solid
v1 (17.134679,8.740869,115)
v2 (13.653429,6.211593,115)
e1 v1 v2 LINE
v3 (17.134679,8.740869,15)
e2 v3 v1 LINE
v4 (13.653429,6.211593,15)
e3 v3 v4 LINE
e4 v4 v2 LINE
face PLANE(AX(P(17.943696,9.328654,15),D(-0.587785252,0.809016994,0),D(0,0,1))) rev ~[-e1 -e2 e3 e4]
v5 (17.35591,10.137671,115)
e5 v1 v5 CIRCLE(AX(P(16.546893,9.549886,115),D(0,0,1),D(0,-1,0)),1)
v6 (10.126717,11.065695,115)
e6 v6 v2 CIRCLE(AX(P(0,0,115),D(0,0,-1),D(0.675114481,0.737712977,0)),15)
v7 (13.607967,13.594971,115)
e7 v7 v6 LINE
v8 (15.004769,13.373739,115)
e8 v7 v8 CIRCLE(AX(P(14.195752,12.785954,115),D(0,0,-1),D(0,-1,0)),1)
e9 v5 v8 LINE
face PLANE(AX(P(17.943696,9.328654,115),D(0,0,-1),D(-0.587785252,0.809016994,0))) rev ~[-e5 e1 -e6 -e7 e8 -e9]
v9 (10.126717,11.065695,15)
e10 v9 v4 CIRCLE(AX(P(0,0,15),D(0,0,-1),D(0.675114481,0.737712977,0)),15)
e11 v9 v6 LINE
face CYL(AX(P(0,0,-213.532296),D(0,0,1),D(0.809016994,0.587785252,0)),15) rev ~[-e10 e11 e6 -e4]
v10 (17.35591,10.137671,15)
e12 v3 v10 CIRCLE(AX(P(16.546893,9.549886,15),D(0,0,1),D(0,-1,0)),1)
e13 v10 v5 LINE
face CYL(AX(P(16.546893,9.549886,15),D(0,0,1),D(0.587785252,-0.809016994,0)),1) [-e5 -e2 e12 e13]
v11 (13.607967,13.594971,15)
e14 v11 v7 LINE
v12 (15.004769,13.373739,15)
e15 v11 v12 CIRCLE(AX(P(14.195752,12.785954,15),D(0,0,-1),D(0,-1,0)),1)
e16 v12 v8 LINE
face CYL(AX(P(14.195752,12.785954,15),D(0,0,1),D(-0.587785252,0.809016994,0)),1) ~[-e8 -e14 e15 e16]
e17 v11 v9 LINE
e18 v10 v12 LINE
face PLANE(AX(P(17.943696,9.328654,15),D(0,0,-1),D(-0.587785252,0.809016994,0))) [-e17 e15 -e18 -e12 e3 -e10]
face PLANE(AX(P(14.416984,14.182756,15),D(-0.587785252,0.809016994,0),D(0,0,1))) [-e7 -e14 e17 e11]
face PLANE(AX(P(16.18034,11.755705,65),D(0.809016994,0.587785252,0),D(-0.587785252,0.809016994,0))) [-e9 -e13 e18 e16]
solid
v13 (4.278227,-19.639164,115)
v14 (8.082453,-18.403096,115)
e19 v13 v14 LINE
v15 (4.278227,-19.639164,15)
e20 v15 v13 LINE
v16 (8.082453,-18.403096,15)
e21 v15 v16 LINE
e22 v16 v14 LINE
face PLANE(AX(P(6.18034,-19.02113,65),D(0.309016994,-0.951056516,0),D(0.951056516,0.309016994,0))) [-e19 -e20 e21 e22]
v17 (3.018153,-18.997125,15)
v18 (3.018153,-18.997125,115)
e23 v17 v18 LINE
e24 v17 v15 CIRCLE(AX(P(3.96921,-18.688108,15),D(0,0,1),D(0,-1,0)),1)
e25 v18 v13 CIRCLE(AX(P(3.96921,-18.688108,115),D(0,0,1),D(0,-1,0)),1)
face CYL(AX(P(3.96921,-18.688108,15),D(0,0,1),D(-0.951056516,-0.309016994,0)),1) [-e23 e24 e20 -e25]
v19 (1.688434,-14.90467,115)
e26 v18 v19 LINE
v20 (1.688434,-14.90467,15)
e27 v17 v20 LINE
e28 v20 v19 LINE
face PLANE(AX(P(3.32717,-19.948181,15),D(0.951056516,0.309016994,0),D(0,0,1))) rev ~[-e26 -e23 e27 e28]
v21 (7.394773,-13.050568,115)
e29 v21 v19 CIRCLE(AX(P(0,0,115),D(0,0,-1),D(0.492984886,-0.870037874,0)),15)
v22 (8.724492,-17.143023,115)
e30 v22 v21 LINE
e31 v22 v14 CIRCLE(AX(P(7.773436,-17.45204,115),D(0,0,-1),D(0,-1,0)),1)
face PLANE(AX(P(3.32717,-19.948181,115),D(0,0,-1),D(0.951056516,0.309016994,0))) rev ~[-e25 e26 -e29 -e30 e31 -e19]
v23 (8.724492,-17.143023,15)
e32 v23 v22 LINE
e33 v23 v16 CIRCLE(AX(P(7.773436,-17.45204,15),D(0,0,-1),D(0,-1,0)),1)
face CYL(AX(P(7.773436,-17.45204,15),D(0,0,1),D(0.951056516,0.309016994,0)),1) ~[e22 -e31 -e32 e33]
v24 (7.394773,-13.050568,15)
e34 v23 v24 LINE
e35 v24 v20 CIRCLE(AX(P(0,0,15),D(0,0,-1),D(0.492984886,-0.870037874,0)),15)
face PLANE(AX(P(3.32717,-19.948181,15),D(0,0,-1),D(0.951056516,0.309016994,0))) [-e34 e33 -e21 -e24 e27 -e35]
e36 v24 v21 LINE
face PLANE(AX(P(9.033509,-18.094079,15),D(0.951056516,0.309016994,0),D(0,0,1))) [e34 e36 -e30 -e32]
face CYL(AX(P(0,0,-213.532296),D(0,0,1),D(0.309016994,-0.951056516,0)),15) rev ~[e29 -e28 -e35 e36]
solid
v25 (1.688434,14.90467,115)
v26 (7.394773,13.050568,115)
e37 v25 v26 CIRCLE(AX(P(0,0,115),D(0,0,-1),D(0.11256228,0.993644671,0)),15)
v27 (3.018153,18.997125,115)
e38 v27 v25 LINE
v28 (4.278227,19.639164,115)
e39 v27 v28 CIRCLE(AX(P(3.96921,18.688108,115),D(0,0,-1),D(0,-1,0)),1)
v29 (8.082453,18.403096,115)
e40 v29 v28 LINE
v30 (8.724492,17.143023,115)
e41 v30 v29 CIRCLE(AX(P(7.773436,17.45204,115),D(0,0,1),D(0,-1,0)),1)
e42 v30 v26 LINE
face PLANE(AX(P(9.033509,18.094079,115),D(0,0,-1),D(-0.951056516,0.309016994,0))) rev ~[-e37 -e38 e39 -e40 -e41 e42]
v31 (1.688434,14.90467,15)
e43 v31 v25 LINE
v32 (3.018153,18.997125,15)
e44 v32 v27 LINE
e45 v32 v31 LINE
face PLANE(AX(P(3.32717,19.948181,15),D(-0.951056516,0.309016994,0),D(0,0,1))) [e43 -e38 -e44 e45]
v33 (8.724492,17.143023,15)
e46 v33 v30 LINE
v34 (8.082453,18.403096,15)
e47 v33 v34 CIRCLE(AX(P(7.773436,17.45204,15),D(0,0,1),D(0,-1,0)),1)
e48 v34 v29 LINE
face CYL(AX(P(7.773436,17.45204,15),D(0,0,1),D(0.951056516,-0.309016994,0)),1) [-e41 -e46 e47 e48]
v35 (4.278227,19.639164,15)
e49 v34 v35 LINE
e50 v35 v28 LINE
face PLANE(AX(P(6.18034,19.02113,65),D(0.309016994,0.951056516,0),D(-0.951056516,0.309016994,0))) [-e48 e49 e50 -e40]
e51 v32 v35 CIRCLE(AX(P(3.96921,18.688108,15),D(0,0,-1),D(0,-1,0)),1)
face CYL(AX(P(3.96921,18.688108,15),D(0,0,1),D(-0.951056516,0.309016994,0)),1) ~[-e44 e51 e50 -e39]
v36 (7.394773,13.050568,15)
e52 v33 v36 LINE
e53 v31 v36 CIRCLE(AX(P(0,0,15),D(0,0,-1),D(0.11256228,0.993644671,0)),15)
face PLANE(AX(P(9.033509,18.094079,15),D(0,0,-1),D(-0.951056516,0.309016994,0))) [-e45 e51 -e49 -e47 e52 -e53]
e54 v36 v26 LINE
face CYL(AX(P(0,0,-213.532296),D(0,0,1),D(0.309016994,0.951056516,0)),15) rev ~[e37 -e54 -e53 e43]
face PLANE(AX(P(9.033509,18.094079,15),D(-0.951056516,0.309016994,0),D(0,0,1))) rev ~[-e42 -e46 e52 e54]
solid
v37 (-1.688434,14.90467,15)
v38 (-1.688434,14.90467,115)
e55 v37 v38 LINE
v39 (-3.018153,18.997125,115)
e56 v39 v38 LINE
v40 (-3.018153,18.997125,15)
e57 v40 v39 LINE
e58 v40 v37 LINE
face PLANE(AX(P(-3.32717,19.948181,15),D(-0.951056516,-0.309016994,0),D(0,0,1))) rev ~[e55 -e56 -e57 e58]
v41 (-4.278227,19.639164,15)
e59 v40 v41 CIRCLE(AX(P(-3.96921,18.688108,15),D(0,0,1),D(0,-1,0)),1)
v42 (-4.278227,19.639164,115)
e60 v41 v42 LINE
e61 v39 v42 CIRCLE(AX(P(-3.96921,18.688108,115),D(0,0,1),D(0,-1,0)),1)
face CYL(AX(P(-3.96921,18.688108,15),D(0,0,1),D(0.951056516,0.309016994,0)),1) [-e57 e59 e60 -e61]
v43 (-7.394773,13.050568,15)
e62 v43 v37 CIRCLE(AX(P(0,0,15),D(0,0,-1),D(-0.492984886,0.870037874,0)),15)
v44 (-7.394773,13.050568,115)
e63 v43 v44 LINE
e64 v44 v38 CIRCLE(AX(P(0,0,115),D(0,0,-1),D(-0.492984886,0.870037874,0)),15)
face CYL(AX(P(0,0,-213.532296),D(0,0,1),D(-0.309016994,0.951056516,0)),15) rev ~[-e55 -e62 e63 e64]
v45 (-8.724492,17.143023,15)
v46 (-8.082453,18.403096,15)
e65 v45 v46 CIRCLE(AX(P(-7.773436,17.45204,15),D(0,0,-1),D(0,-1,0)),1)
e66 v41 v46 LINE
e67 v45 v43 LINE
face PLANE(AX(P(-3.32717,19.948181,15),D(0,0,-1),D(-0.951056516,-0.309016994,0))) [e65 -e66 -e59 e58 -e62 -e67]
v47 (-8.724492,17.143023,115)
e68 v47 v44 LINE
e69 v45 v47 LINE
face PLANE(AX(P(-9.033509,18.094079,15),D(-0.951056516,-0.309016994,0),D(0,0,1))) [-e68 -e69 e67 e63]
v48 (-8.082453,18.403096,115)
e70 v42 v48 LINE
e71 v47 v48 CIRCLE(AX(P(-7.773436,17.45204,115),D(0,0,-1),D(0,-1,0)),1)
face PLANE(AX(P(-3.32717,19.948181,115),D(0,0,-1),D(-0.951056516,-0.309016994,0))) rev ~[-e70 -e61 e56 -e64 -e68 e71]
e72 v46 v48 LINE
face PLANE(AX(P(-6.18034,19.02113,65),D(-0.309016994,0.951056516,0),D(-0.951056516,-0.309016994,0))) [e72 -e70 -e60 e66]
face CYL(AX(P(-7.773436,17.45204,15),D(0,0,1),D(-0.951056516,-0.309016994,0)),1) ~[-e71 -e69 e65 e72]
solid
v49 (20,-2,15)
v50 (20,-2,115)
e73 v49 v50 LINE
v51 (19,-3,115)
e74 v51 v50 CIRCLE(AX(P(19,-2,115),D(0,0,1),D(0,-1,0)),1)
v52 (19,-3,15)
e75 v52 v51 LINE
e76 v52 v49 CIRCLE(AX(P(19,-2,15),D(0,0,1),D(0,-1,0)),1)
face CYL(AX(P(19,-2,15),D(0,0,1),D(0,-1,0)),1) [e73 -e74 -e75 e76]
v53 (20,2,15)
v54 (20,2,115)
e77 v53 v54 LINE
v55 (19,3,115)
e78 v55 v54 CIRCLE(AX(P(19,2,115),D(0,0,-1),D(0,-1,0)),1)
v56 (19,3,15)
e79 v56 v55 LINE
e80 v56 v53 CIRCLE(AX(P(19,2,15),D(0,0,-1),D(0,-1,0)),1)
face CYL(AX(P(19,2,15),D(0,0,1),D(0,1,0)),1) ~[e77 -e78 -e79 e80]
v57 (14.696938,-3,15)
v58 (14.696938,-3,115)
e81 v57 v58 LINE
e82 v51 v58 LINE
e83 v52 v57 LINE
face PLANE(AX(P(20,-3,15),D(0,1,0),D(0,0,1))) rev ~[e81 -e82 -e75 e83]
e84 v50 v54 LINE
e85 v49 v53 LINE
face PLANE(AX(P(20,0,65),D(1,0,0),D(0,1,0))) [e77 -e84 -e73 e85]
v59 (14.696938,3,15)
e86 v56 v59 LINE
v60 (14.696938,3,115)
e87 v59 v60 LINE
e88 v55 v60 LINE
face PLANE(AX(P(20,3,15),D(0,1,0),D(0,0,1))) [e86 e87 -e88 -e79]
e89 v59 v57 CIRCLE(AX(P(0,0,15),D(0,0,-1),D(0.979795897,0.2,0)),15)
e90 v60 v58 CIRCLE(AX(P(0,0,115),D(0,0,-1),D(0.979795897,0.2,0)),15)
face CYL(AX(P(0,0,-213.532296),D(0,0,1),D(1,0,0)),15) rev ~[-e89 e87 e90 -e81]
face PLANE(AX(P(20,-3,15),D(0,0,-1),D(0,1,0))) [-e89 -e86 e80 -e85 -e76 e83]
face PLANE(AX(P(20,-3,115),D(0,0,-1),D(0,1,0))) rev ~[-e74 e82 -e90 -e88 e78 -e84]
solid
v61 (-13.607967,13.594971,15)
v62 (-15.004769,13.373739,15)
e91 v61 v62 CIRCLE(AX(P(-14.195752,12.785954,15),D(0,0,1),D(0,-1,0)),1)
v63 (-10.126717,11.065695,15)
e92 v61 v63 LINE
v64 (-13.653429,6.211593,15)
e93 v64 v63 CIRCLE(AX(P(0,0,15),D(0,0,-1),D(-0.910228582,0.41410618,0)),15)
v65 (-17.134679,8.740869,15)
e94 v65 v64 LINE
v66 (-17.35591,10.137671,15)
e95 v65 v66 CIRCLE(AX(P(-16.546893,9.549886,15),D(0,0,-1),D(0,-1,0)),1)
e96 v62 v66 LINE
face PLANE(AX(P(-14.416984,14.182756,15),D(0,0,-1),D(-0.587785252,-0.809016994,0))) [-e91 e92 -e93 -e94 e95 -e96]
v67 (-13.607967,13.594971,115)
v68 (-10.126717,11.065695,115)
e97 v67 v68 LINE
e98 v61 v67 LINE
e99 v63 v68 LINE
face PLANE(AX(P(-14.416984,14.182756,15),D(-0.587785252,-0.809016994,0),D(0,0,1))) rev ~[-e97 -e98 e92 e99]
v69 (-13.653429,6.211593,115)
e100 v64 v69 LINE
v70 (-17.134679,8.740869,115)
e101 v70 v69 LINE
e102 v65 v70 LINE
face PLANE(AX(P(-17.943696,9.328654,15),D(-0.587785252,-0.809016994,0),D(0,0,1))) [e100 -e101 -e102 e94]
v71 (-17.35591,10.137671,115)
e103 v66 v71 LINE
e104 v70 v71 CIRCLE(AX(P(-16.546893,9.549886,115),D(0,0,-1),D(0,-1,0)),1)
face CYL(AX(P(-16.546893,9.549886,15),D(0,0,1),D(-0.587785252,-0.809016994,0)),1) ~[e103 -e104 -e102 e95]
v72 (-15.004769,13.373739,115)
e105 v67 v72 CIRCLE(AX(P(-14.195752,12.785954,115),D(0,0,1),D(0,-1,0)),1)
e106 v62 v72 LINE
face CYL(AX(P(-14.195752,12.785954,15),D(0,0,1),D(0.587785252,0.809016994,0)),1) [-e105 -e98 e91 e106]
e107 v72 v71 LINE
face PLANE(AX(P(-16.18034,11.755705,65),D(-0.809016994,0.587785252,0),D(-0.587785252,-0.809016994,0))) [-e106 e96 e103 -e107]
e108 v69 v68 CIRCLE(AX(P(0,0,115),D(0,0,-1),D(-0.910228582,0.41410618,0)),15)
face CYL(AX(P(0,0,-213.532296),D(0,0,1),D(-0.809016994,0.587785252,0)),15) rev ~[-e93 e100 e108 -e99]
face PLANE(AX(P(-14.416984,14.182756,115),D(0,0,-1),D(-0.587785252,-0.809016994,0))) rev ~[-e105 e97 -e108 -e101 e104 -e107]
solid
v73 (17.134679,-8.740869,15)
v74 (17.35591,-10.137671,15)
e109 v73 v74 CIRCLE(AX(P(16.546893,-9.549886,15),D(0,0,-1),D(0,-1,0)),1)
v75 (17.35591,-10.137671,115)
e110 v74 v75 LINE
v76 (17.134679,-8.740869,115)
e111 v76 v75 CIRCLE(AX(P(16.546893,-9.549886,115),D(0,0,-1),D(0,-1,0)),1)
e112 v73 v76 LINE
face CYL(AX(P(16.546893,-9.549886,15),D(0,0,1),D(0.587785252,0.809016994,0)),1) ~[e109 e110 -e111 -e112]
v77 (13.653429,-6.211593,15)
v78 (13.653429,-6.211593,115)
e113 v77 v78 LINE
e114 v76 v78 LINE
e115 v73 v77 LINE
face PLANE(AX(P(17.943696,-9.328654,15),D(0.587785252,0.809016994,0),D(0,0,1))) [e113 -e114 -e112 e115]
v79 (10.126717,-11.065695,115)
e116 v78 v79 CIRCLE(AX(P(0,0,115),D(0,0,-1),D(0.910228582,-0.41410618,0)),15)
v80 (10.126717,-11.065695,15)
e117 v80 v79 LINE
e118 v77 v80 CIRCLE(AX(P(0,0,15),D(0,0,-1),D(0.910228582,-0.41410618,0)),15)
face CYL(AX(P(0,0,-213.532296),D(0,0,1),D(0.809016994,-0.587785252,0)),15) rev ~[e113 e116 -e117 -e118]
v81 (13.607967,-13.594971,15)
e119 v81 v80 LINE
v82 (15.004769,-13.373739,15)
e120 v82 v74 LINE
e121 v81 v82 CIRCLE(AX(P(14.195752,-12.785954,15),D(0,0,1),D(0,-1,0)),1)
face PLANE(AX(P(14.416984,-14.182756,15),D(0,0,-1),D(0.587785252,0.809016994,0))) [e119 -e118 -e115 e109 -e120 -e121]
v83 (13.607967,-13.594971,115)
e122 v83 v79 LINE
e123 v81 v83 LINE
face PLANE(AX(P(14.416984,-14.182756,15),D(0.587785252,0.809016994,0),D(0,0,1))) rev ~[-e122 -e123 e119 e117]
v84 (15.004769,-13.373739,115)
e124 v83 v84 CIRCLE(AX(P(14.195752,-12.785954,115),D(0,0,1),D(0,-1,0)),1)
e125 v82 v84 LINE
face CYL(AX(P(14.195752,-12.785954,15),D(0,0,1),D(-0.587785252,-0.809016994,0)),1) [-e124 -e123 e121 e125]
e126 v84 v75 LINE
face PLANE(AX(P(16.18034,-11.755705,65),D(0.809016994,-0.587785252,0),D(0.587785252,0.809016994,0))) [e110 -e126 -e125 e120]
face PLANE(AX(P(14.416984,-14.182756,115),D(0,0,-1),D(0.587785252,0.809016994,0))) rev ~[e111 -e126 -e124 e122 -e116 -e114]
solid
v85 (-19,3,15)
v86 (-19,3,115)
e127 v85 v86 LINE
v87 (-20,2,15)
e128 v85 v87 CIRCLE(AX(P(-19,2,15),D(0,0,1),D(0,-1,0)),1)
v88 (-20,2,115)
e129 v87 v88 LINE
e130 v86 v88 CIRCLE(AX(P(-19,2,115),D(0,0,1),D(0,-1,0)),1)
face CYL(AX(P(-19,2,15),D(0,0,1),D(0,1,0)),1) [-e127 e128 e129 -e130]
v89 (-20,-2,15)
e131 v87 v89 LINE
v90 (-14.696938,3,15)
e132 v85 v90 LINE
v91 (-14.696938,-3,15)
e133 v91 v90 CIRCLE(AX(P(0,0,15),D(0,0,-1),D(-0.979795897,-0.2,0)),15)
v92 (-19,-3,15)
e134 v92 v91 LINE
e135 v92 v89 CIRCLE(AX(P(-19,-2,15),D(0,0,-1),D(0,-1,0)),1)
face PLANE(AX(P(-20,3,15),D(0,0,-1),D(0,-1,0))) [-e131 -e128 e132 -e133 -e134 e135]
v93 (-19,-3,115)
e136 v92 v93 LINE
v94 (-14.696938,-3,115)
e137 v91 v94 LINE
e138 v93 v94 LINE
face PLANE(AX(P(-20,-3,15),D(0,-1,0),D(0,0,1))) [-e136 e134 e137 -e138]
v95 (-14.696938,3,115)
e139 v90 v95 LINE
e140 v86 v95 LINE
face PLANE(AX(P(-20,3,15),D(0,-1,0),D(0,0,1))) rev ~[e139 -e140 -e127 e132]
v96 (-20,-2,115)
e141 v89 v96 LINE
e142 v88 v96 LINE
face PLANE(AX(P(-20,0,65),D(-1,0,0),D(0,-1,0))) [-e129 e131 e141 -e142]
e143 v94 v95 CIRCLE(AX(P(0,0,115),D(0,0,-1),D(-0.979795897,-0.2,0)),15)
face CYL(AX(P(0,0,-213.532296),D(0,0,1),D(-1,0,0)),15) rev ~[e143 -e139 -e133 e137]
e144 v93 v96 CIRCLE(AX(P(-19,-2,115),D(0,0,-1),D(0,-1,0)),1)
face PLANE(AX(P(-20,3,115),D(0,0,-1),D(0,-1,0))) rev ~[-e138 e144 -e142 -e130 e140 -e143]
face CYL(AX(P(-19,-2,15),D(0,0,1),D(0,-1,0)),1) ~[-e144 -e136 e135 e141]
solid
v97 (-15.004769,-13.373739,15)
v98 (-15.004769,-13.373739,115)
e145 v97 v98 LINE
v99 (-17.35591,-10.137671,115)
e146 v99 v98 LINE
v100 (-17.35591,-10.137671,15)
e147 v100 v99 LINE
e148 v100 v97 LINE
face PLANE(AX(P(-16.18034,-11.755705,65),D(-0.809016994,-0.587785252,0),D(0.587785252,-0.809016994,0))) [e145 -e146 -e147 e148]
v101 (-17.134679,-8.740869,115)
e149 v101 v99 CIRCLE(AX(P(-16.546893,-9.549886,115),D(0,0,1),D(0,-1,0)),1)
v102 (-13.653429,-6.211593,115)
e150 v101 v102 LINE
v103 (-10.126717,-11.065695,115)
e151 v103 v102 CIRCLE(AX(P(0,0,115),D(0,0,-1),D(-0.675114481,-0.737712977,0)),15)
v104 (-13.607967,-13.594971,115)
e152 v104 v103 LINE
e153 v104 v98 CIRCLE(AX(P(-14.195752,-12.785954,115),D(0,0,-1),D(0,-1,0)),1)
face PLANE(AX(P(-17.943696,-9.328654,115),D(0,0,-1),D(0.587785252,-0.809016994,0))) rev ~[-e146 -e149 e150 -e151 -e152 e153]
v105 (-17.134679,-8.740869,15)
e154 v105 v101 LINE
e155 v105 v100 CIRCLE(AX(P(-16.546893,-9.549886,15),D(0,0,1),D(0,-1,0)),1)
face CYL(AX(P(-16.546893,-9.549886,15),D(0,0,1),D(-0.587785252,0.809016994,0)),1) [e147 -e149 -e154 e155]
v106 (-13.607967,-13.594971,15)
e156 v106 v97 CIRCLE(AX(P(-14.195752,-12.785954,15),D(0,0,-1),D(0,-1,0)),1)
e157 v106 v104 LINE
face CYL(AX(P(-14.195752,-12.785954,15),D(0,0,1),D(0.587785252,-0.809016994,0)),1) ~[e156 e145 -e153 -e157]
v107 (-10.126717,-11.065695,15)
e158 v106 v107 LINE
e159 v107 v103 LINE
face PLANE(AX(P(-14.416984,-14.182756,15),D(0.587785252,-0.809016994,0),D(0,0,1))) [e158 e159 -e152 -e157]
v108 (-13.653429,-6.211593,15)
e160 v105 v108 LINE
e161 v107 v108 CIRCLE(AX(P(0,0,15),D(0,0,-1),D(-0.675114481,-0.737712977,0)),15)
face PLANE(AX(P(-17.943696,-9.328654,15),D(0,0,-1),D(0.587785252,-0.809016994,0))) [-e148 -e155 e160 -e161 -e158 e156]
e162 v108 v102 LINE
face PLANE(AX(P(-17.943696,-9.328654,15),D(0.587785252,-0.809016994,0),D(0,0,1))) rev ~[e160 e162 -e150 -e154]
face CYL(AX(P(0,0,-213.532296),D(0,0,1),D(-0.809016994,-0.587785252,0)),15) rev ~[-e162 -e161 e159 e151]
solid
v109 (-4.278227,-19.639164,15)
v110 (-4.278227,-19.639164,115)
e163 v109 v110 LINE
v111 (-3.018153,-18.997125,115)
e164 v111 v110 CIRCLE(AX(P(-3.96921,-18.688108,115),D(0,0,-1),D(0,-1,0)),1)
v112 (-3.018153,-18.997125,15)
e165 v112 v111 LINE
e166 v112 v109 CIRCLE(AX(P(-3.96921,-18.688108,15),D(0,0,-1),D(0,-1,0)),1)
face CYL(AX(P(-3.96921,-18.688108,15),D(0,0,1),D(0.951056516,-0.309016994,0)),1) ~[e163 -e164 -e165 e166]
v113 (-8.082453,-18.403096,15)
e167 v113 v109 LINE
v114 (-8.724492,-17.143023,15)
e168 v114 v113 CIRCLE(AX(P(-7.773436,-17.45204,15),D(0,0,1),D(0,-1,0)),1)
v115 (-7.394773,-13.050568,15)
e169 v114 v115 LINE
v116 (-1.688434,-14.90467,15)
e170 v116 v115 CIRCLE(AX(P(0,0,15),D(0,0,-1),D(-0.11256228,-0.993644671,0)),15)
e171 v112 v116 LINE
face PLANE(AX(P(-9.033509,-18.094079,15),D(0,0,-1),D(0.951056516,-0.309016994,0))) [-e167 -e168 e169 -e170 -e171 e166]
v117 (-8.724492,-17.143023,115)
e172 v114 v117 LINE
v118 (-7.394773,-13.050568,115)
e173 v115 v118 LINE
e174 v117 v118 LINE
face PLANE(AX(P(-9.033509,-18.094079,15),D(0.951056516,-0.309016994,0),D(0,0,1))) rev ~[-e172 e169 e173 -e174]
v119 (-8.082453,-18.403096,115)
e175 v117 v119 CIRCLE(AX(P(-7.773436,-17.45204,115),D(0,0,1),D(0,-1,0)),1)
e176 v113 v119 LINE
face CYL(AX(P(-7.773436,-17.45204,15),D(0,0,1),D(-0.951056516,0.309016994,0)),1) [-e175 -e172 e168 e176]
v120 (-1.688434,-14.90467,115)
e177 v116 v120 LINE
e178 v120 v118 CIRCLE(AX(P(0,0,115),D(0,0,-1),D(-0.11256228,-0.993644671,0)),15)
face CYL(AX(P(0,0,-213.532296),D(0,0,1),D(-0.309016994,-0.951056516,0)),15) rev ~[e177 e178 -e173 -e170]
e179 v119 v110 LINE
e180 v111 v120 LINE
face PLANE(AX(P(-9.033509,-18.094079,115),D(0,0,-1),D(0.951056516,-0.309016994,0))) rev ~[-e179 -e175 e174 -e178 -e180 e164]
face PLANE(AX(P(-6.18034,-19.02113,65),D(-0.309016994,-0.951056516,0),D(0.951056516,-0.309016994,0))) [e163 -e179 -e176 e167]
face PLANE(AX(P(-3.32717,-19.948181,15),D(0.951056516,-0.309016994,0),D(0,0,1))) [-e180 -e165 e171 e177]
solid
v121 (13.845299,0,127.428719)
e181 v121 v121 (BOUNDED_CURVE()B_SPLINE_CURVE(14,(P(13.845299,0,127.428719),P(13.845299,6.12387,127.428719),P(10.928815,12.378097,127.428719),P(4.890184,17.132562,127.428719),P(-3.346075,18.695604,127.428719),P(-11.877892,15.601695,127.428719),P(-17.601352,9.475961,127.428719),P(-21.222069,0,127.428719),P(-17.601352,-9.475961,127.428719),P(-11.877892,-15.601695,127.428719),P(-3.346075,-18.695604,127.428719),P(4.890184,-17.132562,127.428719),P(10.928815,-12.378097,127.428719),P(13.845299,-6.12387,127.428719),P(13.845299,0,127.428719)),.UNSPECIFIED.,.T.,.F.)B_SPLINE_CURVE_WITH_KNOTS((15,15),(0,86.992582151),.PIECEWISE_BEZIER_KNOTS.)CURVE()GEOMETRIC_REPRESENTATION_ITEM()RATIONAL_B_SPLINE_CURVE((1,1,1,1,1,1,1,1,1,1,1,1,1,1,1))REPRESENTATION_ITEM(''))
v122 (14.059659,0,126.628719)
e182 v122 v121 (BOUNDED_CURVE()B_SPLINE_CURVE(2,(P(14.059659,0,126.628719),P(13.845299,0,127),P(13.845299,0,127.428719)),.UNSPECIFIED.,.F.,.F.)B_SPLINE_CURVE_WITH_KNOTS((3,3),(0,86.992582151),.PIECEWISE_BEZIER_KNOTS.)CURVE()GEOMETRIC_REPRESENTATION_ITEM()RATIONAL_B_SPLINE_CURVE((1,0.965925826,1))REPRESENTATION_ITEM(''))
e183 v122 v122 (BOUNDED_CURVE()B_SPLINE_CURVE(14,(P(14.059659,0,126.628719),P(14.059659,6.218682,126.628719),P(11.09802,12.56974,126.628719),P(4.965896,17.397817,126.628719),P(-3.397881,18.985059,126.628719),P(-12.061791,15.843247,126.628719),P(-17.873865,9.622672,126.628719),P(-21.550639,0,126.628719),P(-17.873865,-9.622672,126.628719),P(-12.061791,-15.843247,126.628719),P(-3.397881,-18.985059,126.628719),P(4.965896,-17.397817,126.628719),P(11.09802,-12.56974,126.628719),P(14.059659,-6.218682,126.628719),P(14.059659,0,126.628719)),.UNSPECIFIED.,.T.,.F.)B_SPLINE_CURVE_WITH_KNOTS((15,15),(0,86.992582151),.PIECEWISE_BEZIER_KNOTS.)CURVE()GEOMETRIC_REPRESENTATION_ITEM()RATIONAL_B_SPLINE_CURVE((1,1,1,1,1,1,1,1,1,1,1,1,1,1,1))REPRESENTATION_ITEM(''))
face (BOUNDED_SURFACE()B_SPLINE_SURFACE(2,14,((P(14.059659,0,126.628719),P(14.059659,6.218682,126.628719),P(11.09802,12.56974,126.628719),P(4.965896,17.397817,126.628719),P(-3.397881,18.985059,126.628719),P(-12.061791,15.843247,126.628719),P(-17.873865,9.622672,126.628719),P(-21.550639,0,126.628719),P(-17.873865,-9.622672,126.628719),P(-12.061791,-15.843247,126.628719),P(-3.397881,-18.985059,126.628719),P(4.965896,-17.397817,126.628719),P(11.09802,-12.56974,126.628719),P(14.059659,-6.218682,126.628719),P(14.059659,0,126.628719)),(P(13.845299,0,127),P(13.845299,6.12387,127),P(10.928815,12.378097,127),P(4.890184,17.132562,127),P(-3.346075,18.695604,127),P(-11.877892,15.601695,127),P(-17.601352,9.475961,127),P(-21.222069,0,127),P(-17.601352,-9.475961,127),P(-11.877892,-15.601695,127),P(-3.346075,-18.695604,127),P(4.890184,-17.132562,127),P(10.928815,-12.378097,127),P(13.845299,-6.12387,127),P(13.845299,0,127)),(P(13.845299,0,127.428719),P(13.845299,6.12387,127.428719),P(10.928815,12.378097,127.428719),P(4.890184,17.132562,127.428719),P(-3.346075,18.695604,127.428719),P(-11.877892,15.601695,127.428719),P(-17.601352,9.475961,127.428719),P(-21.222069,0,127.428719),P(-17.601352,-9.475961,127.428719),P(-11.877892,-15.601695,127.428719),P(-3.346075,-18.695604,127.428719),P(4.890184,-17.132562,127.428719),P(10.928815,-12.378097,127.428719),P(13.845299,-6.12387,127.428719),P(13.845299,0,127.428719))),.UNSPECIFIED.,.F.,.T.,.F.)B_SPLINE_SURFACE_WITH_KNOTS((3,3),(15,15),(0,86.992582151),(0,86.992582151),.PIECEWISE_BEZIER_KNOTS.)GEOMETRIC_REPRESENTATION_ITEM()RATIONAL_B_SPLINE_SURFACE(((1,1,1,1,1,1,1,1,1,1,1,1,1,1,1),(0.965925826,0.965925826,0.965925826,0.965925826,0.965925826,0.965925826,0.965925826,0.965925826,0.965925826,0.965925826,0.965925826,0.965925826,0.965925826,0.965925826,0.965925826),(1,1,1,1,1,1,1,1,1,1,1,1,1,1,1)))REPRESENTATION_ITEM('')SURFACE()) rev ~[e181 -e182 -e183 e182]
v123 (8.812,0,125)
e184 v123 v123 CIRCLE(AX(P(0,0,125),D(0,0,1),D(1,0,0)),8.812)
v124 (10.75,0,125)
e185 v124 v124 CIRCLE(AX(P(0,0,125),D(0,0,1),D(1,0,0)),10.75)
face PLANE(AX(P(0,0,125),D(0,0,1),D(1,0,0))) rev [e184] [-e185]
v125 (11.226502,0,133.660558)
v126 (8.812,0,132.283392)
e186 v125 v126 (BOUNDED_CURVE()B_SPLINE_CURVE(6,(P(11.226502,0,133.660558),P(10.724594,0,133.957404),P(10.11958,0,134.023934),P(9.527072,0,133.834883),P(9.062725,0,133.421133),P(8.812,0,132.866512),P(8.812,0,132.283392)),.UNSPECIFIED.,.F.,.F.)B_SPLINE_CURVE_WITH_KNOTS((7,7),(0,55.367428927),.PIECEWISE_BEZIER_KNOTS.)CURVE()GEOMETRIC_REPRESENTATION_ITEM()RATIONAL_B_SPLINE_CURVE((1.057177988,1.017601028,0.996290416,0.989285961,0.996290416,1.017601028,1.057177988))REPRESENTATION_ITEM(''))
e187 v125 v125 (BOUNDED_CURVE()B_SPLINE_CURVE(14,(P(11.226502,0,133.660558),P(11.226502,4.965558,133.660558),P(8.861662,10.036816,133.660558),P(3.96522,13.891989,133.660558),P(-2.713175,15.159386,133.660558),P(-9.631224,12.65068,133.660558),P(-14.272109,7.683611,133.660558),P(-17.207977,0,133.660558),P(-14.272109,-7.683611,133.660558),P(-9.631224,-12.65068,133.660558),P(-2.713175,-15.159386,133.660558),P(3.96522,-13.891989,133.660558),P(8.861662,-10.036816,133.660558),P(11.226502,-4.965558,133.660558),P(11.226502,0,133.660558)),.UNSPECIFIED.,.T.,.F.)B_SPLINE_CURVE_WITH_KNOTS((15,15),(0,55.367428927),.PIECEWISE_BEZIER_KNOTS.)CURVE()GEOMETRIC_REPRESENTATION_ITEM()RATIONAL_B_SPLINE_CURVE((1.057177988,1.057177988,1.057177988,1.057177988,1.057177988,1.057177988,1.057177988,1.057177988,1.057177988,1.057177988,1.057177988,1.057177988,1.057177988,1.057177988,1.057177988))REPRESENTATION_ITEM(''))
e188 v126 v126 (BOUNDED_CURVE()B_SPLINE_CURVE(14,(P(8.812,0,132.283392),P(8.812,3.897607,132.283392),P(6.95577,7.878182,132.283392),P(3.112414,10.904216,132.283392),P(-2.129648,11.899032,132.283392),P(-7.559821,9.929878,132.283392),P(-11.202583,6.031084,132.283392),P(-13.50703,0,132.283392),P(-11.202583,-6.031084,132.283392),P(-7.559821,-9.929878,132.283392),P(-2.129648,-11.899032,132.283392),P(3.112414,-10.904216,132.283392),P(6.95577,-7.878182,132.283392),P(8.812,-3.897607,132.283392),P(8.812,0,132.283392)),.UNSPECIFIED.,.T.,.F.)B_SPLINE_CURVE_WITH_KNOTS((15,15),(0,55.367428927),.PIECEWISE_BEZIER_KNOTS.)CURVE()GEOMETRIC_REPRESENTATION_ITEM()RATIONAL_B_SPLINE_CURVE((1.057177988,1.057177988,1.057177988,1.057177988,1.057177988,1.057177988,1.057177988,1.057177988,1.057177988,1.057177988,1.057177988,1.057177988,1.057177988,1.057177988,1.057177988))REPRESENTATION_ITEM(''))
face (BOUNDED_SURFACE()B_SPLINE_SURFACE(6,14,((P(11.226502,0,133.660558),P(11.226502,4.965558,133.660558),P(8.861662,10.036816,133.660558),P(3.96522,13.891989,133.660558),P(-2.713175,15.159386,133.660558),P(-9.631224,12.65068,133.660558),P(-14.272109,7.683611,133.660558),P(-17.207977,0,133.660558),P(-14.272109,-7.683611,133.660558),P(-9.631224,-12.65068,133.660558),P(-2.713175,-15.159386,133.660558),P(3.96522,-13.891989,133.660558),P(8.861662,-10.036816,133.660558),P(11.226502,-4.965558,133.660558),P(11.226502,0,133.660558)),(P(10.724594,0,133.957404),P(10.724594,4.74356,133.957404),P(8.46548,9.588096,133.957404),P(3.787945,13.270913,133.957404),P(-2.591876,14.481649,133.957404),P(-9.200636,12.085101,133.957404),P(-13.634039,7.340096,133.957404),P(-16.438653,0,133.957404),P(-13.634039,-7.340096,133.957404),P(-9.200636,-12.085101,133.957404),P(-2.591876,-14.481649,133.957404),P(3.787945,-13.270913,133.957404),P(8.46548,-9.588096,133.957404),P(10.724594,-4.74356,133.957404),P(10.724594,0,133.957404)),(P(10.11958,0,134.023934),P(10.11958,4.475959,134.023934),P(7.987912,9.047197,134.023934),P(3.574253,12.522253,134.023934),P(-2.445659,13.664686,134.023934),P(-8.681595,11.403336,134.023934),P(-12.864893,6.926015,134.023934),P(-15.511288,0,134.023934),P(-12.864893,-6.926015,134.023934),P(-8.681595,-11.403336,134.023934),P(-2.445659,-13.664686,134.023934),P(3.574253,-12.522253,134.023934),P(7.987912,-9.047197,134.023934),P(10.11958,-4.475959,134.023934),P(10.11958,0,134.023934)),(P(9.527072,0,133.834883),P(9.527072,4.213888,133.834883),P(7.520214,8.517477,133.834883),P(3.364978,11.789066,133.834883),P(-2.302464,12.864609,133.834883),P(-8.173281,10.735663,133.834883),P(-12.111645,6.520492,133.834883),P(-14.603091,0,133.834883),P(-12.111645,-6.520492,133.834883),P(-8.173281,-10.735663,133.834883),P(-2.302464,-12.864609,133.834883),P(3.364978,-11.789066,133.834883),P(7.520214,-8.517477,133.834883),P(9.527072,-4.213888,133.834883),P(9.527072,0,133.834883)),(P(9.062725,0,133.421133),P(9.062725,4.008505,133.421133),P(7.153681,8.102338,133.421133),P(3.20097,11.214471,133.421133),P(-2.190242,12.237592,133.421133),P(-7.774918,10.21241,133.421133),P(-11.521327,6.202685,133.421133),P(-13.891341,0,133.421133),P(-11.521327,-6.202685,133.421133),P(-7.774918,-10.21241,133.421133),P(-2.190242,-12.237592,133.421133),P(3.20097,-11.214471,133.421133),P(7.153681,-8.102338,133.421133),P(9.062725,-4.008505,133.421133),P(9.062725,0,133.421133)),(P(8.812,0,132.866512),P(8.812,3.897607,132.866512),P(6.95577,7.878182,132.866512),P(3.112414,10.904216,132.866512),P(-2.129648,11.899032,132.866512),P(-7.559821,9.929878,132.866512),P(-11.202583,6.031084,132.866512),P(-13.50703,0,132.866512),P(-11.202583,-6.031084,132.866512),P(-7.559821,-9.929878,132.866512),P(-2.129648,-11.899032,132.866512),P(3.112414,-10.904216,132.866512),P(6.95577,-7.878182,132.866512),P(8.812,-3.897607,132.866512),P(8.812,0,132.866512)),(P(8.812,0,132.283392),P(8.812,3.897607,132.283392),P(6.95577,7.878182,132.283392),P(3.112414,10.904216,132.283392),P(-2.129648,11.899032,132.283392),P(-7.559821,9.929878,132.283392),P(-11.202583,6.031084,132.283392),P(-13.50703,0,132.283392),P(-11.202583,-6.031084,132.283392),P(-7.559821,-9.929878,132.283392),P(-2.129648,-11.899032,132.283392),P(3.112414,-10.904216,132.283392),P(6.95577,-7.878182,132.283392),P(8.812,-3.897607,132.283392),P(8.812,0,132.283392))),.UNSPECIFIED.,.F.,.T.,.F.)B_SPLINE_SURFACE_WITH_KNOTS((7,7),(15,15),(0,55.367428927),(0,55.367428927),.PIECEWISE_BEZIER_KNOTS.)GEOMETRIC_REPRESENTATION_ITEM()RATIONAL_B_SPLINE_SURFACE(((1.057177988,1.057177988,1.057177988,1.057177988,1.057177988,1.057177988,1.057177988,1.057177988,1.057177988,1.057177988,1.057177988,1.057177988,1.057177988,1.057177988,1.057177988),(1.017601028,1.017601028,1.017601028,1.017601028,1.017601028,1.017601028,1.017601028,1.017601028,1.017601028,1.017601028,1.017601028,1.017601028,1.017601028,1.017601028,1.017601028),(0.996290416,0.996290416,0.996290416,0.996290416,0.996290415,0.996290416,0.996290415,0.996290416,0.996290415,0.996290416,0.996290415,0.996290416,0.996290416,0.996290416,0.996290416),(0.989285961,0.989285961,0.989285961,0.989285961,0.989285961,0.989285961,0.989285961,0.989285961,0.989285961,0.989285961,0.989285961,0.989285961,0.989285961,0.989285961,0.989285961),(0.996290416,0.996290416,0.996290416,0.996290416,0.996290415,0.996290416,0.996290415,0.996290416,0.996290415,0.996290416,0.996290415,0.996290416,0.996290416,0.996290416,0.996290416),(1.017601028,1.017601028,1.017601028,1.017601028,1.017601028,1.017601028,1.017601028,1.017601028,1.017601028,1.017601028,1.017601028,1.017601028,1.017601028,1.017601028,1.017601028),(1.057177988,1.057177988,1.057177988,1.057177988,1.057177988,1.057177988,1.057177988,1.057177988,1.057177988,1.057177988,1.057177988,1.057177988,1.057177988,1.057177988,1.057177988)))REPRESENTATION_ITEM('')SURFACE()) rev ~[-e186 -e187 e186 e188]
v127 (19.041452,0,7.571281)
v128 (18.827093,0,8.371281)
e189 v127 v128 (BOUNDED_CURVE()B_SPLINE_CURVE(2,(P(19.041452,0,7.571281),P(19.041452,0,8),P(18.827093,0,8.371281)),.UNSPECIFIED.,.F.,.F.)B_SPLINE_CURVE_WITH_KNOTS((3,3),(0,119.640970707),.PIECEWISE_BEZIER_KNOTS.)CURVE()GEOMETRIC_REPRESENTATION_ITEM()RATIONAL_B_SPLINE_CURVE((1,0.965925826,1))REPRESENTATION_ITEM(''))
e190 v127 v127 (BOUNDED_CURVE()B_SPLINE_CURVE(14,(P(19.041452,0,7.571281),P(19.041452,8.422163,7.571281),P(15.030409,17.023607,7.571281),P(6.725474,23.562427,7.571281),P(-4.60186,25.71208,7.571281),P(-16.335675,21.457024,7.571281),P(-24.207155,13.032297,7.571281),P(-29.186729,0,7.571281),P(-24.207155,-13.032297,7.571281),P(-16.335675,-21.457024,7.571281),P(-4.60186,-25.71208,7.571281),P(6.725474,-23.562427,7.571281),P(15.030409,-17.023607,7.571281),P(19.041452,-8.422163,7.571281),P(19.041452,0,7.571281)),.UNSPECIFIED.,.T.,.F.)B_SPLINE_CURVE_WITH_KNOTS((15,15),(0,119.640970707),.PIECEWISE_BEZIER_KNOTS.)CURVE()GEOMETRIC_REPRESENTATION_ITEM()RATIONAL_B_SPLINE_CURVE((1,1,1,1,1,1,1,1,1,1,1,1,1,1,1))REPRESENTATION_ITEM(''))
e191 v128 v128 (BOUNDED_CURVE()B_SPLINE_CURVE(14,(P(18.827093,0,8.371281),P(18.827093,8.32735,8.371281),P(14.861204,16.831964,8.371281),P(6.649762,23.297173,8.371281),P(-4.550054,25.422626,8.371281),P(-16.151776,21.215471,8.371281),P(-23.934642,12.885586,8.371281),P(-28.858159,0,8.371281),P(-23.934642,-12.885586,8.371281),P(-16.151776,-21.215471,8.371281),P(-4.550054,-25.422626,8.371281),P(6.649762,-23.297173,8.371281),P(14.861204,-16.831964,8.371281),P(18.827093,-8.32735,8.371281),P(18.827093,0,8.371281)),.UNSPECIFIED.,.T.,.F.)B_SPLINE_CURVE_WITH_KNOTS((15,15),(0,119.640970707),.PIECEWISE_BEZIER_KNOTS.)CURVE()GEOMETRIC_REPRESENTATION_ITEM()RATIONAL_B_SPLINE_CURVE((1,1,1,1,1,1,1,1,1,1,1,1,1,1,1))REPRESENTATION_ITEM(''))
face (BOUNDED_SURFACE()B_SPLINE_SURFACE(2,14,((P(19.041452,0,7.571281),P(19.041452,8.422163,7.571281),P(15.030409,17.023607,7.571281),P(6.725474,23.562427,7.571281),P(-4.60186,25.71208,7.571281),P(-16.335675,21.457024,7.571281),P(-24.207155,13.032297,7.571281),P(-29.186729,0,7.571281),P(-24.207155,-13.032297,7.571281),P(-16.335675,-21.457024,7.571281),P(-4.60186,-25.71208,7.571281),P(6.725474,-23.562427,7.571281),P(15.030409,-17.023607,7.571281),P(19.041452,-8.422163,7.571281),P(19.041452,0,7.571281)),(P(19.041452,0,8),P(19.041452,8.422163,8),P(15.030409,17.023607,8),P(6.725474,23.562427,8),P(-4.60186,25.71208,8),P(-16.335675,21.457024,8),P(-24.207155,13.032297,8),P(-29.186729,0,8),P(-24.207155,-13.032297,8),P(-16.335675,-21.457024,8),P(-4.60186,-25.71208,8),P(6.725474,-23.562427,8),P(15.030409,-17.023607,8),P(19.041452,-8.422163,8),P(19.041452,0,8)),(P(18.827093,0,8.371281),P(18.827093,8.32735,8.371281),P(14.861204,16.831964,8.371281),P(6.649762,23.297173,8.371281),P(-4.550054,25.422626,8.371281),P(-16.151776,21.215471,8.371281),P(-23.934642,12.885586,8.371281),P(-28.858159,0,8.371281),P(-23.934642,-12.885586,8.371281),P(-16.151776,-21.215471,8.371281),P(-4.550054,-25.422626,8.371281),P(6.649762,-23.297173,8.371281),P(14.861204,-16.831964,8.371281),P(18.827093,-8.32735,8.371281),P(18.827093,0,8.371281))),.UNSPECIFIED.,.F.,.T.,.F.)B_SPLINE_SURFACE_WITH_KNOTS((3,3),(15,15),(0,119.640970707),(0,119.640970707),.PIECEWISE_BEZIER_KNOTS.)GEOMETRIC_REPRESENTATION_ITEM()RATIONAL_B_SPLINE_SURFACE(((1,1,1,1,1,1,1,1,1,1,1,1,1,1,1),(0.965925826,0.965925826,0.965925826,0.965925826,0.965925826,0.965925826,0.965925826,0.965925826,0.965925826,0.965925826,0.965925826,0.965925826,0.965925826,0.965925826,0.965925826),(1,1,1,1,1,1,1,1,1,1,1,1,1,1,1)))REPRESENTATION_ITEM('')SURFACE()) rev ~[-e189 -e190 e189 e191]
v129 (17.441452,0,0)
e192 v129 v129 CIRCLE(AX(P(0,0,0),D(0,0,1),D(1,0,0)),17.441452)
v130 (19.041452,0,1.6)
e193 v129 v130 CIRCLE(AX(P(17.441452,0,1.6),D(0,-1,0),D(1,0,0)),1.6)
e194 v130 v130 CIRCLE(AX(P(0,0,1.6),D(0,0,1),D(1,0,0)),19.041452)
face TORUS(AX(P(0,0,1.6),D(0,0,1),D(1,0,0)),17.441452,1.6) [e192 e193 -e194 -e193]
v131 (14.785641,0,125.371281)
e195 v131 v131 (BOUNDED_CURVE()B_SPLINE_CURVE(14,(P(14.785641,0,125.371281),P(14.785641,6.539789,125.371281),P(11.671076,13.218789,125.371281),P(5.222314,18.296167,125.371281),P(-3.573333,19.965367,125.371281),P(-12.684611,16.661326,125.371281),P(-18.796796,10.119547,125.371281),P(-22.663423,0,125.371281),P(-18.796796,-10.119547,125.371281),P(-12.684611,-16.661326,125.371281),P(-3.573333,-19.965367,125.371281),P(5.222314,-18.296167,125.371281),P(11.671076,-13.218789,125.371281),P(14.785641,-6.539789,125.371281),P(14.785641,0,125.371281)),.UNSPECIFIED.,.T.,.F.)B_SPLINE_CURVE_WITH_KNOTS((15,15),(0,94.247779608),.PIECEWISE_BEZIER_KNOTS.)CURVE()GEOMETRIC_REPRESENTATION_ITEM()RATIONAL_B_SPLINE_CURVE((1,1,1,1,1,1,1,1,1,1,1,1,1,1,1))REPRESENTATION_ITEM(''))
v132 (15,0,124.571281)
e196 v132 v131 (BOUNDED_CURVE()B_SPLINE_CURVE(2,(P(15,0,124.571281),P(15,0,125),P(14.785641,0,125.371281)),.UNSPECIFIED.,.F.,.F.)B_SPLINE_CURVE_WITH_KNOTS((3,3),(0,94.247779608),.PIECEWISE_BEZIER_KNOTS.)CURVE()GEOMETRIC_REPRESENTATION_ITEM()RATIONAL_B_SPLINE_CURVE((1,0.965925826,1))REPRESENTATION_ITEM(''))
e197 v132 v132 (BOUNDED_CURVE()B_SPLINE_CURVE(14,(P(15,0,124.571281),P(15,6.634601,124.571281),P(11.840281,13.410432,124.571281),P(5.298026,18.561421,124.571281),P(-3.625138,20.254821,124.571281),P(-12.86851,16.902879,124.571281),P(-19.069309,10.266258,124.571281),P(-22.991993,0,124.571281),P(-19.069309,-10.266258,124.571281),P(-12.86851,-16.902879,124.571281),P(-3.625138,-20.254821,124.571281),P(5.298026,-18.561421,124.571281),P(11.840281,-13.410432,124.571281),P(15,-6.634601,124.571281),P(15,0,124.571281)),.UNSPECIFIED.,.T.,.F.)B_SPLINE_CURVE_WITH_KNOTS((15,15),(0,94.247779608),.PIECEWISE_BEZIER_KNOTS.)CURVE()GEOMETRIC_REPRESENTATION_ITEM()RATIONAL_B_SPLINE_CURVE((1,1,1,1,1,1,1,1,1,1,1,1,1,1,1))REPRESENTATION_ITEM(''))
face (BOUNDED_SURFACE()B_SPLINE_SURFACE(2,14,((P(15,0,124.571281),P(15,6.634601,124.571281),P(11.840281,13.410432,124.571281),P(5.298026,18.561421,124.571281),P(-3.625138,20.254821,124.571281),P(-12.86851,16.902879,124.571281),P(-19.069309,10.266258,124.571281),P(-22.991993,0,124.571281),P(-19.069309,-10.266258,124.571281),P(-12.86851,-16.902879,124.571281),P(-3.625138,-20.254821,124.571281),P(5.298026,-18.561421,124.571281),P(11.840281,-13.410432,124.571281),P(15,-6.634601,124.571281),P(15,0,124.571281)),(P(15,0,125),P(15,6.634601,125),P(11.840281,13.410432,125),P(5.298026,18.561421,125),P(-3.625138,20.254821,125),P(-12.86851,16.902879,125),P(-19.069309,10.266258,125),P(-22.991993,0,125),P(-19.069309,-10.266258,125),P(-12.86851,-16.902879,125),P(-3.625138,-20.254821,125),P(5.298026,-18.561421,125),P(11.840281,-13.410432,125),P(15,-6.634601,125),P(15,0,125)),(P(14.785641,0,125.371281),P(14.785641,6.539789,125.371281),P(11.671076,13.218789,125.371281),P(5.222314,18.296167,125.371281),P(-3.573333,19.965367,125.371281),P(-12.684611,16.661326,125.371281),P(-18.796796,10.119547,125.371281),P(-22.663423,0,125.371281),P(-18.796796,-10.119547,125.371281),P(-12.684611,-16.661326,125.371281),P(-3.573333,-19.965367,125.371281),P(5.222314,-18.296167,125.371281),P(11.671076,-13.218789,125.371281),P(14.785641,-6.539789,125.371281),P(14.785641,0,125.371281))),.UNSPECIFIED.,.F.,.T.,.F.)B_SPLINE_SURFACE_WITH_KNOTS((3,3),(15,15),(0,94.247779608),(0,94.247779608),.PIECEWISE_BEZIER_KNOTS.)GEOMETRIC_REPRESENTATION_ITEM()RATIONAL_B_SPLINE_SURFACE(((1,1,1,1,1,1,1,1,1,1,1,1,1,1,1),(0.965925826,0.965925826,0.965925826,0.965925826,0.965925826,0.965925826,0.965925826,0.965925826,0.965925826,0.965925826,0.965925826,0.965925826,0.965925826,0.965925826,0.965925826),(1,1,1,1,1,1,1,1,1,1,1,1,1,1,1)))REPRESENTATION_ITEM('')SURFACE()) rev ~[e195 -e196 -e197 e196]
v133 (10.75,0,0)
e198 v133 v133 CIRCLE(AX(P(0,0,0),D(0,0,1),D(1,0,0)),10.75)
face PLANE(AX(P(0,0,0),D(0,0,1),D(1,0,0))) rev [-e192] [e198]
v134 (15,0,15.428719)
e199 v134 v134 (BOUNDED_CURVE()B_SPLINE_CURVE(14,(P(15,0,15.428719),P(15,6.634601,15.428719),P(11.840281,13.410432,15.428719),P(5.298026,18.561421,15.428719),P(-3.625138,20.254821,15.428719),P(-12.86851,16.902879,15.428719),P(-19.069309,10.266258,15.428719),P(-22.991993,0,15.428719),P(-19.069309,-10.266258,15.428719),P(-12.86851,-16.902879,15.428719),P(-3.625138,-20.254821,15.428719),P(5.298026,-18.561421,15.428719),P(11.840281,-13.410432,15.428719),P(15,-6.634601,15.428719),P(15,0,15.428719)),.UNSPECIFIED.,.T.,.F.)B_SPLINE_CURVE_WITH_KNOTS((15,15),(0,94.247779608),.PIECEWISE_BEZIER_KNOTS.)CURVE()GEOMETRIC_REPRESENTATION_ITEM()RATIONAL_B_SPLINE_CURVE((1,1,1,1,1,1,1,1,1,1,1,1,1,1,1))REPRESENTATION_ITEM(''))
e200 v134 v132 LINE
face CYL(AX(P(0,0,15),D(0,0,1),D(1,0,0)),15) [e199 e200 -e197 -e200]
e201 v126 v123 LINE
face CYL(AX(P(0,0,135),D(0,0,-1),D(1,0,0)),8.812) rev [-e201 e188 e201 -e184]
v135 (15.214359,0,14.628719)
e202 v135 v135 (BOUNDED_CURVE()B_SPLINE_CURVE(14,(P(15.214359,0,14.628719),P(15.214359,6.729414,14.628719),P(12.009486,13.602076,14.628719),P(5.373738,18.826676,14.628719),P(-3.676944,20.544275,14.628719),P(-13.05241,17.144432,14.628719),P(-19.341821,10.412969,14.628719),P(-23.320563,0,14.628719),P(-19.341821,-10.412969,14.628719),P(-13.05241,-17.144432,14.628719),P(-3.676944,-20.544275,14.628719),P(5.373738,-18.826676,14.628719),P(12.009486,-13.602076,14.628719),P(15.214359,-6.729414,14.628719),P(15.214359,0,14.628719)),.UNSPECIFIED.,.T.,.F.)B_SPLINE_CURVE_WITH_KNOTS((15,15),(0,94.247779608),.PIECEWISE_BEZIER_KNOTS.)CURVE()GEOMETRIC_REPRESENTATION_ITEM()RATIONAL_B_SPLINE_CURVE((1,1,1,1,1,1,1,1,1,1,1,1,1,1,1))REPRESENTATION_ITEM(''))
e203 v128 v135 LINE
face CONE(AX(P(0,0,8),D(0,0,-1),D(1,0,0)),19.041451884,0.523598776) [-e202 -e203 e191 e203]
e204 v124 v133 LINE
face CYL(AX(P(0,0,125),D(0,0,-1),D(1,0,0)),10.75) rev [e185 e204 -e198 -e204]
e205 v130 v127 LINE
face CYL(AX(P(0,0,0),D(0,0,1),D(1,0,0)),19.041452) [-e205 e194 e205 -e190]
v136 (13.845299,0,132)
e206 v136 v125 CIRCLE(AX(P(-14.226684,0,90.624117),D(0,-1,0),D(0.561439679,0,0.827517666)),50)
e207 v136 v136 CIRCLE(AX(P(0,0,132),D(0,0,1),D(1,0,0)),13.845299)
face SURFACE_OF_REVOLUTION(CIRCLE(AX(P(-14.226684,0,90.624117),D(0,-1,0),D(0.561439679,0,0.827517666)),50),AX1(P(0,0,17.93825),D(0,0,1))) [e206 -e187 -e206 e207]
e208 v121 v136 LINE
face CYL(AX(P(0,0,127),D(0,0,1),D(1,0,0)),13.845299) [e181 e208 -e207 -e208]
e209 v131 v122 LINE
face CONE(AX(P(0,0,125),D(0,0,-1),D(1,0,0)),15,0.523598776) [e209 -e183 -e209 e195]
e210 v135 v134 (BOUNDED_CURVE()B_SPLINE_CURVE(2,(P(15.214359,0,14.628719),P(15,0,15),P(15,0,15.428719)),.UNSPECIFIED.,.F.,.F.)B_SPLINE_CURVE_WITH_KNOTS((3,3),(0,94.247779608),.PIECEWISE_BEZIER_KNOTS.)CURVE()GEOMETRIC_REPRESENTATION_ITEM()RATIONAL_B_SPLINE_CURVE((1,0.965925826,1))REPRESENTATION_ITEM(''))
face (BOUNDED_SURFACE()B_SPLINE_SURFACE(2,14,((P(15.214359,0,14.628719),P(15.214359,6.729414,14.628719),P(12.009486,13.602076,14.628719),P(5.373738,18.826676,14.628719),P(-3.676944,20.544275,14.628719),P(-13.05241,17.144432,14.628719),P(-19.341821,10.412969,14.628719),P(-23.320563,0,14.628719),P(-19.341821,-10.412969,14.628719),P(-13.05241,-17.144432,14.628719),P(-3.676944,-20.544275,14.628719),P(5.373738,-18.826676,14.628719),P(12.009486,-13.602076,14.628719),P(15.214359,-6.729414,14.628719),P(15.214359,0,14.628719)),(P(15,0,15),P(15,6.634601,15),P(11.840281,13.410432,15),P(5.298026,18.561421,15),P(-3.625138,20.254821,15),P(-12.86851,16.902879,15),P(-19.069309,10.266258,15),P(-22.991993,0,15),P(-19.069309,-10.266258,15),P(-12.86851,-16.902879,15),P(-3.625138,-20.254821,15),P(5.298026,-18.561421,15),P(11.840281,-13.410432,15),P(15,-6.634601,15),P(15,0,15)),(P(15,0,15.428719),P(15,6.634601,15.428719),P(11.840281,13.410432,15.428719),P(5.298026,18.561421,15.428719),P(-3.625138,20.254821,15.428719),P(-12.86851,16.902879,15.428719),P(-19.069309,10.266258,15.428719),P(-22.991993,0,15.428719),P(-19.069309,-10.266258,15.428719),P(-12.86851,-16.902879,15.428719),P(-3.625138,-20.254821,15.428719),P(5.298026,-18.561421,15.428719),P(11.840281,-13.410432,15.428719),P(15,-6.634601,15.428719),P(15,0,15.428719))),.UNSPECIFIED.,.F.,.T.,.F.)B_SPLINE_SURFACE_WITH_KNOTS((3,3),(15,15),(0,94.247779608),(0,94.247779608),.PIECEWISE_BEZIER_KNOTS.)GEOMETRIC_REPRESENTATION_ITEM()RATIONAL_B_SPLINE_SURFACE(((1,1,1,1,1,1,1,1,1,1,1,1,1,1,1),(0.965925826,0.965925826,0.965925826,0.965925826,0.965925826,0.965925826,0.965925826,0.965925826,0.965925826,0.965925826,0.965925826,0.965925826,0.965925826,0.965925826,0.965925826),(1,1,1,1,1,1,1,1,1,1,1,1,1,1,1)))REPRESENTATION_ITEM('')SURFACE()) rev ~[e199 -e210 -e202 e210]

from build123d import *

# Parameters (mm, degrees)
F2_R            = 1.6
F5_END_RADIUS   = 15
F4_W            = 6
F4_H            = 100
F5_REACH        = 139.2222902753
F5_COPIES_COUNT = 10
F6_R            = 1
F6_2_R          = 1
F6_3_R          = 1
F6_4_R          = 1
F6_5_R          = 1
F6_6_R          = 1
F6_7_R          = 1
F6_8_R          = 1
F6_9_R          = 1
F6_10_R         = 1


# Not quite as in the source:
# - a feature of the source that left no trace in its solid (it failed there, or was rolled back) is left out
# - a pattern or mirror of a feature is missing from the dataset's text; its kind, count and spacing are read off the source's solid


with BuildPart() as f1:
    # F0 (on Front) → F1 (revolve)
    with BuildSketch(Plane.XZ):
        with BuildLine():
            Line((10.75, 125), (10.75, 0))
            Line((10.75, 0), (19.0414518843, 0))
            Line((19.0414518843, 0), (19.0414518843, 8))
            Line((19.0414518843, 8), (15, 15))
            Line((15, 15), (15, 125))
            Line((15, 125), (13.8452994616, 127))
            Line((13.8452994616, 127), (13.8452994616, 132))
            ThreePointArc((13.8452994616, 132), (11.3726339997, 133.5737953324), (8.812, 135))
            Line((8.812, 135), (8.812, 125))
            Line((8.812, 125), (10.75, 125))
        make_face()
    revolve(axis=Axis((0, 0, 17.9382504751), (0, 0, 1)))

    # F2
    f2_edges = [f1.edges().sort_by_distance(p)[0] for p in [
        (-8.812, 0, 135),
        (-13.845299, 0, 127),
        (-15, 0, 125),
        (-15, 0, 15),
        (-19.041452, 0, 8),
        (-19.041452, 0, 0),
    ]]
    fillet(f2_edges, radius=F2_R)


with BuildPart() as f5:
    f5_end = (Plane.XY.offset(70.0000000001) * Cylinder(F5_END_RADIUS, 567.0645927536, mode=Mode.PRIVATE)).faces().sort_by_distance((-15, 0, 70.0000000001))[0]
    # F4 (on offset) → F5 (new body, up to the whole of a round face its end follows)
    with BuildSketch(Plane.YZ.offset(20)):
        with Locations((0, 65)):
            Rectangle(F4_W, F4_H)
    f5_long = extrude(amount=-F5_REACH, mode=Mode.PRIVATE)
    add(split(f5_long, bisect_by=f5_end, keep=Keep.ALL, mode=Mode.PRIVATE).solids().sort_by_distance((20, 0, 65))[0])


with BuildPart() as f5_copies_1:
    # F5_copies: instance of F5
    add(f5.part.rotate(Axis((0, 0, 0), (0, 0, 1)), 1 * 360 / F5_COPIES_COUNT))

    # F6#2
    f6_2_edges = [f5_copies_1.edges().sort_by_distance(p)[0] for p in [
        (17.943696, 9.328654, 65),
        (14.416984, 14.182756, 65),
    ]]
    fillet(f6_2_edges, radius=F6_2_R)


with BuildPart() as f5_copies_2:
    # F5_copies: instance of F5
    add(f5.part.rotate(Axis((0, 0, 0), (0, 0, 1)), 2 * 360 / F5_COPIES_COUNT))

    # F6#3
    f6_3_edges = [f5_copies_2.edges().sort_by_distance(p)[0] for p in [
        (9.033509, 18.094079, 65),
        (3.32717, 19.948181, 65),
    ]]
    fillet(f6_3_edges, radius=F6_3_R)


with BuildPart() as f5_copies_3:
    # F5_copies: instance of F5
    add(f5.part.rotate(Axis((0, 0, 0), (0, 0, 1)), 3 * 360 / F5_COPIES_COUNT))

    # F6#4
    f6_4_edges = [f5_copies_3.edges().sort_by_distance(p)[0] for p in [
        (-3.32717, 19.948181, 65),
        (-9.033509, 18.094079, 65),
    ]]
    fillet(f6_4_edges, radius=F6_4_R)


with BuildPart() as f5_copies_4:
    # F5_copies: instance of F5
    add(f5.part.rotate(Axis((0, 0, 0), (0, 0, 1)), 4 * 360 / F5_COPIES_COUNT))

    # F6#5
    f6_5_edges = [f5_copies_4.edges().sort_by_distance(p)[0] for p in [
        (-14.416984, 14.182756, 65),
        (-17.943696, 9.328654, 65),
    ]]
    fillet(f6_5_edges, radius=F6_5_R)


with BuildPart() as f5_copies_5:
    # F5_copies: instance of F5
    add(f5.part.rotate(Axis((0, 0, 0), (0, 0, 1)), 5 * 360 / F5_COPIES_COUNT))

    # F6#6
    f6_6_edges = [f5_copies_5.edges().sort_by_distance(p)[0] for p in [
        (-20, 3, 65),
        (-20, -3, 65),
    ]]
    fillet(f6_6_edges, radius=F6_6_R)


with BuildPart() as f5_copies_6:
    # F5_copies: instance of F5
    add(f5.part.rotate(Axis((0, 0, 0), (0, 0, 1)), 6 * 360 / F5_COPIES_COUNT))

    # F6#7
    f6_7_edges = [f5_copies_6.edges().sort_by_distance(p)[0] for p in [
        (-17.943696, -9.328654, 65),
        (-14.416984, -14.182756, 65),
    ]]
    fillet(f6_7_edges, radius=F6_7_R)


with BuildPart() as f5_copies_7:
    # F5_copies: instance of F5
    add(f5.part.rotate(Axis((0, 0, 0), (0, 0, 1)), 7 * 360 / F5_COPIES_COUNT))

    # F6#8
    f6_8_edges = [f5_copies_7.edges().sort_by_distance(p)[0] for p in [
        (-9.033509, -18.094079, 65),
        (-3.32717, -19.948181, 65),
    ]]
    fillet(f6_8_edges, radius=F6_8_R)


with BuildPart() as f5_copies_8:
    # F5_copies: instance of F5
    add(f5.part.rotate(Axis((0, 0, 0), (0, 0, 1)), 8 * 360 / F5_COPIES_COUNT))

    # F6#9
    f6_9_edges = [f5_copies_8.edges().sort_by_distance(p)[0] for p in [
        (3.32717, -19.948181, 65),
        (9.033509, -18.094079, 65),
    ]]
    fillet(f6_9_edges, radius=F6_9_R)


with BuildPart() as f5_copies_9:
    # F5_copies: instance of F5
    add(f5.part.rotate(Axis((0, 0, 0), (0, 0, 1)), 9 * 360 / F5_COPIES_COUNT))

    # F6#10
    f6_10_edges = [f5_copies_9.edges().sort_by_distance(p)[0] for p in [
        (14.416984, -14.182756, 65),
        (17.943696, -9.328654, 65),
    ]]
    fillet(f6_10_edges, radius=F6_10_R)


with BuildPart() as f5_1:
    add(f5.part)

    # F6
    f6_edges = [f5_1.edges().sort_by_distance(p)[0] for p in [
        (20, -3, 65),
        (20, 3, 65),
    ]]
    fillet(f6_edges, radius=F6_R)


solid = Compound([f1.part, f5_copies_1.part, f5_copies_2.part, f5_copies_3.part, f5_copies_4.part, f5_copies_5.part, f5_copies_6.part, f5_copies_7.part, f5_copies_8.part, f5_copies_9.part, f5_1.part])
